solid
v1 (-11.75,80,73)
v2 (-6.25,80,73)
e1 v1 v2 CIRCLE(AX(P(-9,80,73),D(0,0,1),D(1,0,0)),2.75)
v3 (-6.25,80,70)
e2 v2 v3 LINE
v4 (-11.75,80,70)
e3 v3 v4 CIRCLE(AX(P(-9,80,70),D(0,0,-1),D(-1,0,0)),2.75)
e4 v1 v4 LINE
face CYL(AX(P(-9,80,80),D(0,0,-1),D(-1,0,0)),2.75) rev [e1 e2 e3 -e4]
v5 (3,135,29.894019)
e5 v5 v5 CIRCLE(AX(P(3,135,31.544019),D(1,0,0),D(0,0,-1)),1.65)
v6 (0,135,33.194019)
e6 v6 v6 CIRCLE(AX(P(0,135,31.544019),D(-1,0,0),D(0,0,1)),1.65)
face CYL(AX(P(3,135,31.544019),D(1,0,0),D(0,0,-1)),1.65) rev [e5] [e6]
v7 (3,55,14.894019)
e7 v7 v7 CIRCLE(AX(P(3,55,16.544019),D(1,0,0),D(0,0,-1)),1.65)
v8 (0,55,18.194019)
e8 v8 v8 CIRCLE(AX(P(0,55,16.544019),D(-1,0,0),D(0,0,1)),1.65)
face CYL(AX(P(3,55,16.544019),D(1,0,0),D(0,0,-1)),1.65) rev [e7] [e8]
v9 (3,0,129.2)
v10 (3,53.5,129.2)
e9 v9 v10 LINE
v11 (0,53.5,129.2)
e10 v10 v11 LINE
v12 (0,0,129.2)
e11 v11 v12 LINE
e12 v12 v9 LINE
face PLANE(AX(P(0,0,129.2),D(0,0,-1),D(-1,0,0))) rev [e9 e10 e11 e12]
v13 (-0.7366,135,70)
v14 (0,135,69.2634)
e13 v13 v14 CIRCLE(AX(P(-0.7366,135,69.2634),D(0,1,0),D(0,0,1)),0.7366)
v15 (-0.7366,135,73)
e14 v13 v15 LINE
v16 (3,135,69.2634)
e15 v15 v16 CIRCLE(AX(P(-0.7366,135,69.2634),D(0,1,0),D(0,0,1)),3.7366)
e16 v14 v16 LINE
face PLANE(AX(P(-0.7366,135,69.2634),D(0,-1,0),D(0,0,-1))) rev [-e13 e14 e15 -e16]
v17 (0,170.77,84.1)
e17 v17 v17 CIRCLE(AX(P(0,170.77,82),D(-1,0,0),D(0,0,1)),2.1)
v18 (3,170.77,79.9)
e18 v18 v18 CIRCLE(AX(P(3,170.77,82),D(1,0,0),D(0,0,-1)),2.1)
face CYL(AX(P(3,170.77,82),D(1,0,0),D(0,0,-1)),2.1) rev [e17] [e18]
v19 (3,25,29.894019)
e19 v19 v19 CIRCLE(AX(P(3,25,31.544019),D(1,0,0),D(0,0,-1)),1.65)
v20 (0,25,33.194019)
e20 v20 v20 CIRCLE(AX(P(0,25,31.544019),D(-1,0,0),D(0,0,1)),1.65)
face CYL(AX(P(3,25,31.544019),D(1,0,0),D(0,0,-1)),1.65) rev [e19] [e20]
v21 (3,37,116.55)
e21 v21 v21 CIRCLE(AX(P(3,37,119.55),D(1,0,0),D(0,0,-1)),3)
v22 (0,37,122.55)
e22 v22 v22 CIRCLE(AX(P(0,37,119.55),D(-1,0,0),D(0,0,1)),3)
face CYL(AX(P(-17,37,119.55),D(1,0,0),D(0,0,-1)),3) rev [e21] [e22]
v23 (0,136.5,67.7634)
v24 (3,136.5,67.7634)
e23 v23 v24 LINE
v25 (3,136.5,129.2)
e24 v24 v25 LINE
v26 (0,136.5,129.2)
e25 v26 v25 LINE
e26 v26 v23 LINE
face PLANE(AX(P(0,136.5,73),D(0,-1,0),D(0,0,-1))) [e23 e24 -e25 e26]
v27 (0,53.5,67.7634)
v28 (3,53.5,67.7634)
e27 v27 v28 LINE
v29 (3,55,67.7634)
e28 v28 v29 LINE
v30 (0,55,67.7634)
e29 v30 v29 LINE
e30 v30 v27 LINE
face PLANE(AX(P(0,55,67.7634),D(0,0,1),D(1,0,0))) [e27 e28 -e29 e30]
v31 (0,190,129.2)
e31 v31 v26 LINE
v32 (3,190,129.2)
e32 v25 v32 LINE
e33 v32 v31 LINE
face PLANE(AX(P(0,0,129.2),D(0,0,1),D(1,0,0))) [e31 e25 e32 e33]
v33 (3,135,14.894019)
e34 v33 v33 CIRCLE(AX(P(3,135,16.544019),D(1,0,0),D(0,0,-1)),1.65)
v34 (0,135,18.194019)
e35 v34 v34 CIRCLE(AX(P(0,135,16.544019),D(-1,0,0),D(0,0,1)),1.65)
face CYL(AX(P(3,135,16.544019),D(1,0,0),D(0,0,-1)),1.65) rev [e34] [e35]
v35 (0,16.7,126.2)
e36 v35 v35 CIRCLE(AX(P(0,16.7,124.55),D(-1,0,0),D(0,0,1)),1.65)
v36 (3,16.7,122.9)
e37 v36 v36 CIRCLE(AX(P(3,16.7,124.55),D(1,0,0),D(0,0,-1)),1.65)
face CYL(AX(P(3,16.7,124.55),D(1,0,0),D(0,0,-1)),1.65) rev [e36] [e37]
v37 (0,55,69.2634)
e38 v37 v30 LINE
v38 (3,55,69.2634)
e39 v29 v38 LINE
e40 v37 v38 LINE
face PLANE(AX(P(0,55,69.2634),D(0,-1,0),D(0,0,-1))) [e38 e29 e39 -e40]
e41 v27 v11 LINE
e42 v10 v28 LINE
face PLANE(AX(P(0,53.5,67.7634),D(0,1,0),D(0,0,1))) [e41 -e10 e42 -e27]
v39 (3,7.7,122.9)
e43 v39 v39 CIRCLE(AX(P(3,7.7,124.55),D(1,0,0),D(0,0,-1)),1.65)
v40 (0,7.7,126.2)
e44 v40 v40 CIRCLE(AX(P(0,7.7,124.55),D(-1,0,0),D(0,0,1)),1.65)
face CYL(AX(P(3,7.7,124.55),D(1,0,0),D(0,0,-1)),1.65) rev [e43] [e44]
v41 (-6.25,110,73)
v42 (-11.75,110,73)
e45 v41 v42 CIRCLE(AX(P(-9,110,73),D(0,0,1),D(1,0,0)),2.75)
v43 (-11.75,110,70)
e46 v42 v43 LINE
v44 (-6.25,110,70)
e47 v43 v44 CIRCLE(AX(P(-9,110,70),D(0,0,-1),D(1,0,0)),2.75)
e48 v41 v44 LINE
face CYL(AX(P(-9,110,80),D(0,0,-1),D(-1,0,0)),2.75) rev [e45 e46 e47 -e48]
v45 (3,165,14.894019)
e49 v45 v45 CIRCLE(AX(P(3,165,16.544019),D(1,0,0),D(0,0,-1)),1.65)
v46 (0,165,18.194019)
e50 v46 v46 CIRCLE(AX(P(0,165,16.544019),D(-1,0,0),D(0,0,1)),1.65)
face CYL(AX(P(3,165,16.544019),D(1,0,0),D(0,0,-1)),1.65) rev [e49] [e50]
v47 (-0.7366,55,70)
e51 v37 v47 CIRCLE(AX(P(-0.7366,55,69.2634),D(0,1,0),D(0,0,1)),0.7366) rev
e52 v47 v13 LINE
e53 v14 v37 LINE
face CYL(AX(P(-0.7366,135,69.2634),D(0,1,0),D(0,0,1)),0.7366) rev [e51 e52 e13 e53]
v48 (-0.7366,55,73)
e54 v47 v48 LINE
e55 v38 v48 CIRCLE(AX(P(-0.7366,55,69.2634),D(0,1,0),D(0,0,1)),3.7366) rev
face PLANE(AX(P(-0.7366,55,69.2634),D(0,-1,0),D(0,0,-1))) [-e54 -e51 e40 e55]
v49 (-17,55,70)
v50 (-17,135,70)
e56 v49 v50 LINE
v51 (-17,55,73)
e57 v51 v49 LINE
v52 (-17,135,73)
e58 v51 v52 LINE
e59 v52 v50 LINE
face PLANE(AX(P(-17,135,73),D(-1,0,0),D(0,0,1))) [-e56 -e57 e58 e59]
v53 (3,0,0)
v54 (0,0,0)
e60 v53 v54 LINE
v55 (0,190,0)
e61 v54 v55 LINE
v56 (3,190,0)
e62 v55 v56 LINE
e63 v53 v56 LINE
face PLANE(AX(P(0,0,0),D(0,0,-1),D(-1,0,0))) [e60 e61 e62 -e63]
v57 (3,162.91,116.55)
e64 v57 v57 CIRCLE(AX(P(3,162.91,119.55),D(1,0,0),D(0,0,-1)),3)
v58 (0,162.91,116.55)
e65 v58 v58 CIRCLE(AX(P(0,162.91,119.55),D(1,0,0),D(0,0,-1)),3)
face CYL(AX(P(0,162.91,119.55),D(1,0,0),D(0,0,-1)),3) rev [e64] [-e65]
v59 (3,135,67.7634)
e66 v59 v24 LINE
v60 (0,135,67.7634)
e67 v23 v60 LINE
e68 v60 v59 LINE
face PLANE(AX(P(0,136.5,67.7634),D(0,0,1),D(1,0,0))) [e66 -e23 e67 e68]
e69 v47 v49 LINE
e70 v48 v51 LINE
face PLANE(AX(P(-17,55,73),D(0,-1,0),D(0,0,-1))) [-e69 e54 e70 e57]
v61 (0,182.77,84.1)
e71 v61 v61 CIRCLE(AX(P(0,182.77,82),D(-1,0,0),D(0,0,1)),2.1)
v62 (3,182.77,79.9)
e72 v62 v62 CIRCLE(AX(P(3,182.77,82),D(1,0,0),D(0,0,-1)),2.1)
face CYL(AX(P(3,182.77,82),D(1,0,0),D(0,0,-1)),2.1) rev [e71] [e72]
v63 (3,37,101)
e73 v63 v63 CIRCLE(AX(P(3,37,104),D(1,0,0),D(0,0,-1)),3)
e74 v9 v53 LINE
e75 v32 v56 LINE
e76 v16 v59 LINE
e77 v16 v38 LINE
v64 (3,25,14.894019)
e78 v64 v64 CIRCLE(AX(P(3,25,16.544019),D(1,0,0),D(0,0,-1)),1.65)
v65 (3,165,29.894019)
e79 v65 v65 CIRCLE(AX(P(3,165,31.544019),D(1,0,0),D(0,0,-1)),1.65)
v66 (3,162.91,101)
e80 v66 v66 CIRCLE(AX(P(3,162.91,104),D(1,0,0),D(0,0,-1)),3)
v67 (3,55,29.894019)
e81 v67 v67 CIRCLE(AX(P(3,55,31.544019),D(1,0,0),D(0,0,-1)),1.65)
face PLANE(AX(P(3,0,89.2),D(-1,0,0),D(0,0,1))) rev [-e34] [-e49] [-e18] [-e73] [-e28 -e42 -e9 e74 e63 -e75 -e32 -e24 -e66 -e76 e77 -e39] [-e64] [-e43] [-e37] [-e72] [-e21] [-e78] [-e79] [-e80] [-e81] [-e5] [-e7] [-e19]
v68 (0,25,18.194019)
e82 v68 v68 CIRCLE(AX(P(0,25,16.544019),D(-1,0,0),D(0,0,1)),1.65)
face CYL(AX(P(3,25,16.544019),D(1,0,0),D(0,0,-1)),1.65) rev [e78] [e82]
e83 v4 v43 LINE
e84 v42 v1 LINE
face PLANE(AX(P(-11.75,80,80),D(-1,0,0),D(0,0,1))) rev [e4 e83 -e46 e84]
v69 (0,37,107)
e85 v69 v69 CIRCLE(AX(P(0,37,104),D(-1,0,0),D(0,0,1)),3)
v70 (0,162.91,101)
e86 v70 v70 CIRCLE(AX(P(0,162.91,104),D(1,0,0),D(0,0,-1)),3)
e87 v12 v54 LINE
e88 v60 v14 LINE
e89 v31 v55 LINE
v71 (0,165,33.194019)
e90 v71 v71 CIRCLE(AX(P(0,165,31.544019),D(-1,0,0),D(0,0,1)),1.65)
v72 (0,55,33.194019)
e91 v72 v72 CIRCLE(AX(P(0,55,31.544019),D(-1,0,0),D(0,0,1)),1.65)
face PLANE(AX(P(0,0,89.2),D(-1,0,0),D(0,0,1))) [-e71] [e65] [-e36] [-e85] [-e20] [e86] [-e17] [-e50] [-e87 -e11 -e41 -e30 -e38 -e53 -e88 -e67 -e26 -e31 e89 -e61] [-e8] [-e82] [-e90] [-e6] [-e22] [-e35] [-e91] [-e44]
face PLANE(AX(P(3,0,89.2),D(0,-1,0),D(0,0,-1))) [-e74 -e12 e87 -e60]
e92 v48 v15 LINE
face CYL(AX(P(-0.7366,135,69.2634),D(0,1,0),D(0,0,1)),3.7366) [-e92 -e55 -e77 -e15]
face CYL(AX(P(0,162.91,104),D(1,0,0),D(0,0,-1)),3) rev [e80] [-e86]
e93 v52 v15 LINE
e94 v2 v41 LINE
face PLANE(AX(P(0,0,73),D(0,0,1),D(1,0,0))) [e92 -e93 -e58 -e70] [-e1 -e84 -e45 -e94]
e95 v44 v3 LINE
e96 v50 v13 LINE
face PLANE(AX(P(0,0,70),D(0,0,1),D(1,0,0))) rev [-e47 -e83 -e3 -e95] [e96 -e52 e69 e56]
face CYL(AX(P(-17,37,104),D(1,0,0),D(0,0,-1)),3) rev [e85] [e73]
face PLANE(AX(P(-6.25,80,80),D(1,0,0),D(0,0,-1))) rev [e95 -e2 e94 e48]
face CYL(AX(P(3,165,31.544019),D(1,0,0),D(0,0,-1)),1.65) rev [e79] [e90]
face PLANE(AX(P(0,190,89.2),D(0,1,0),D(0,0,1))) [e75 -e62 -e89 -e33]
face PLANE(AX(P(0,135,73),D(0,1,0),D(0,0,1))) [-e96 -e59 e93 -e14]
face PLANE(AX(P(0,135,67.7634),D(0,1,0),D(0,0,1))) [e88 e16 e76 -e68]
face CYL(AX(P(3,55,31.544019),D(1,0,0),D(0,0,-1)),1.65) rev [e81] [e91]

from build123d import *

# Parameters (mm, degrees)
SKETCH_2_W               = 3
SKETCH_2_H               = 190
SM_BASE_FLANGE_1_DEPTH   = 89.2
SKETCH_14_W              = 16.2
SKETCH_14_H              = 80
CUT_EXTRUDE_2_DEPTH      = 10
SM_START                 = 53.5
SM_EDGE_FLANGE_1_DEPTH   = 83
SM_EDGE_FLANGE_1_2_DEPTH = 1.5
SM_START_2               = 135
SM_EDGE_FLANGE_1_3_DEPTH = 1.5
SM_START_3               = 55
SM_EDGE_FLANGE_1_4_DEPTH = 80
CUT_EXTRUDE_START        = -1.5
SKETCH_18_W              = 3
SKETCH_18_H              = 16.2
CUT_EXTRUDE_3_DEPTH      = 1.5
SKETCH_19_W              = 3
SKETCH_19_H              = 16.2
CUT_EXTRUDE_4_DEPTH      = 1.5
CUT_EXTRUDE_5_DEPTH      = 10
HOLE_WIZARD_M4_2_D       = 3.3
HOLE_WIZARD_M4_2_DEPTH   = 10.1
HOLE_WIZARD_M4_2_TIP     = 0.991420021
HOLE_WIZARD_M5_1_D       = 4.2
HOLE_WIZARD_M5_1_DEPTH   = 12.4
HOLE_WIZARD_M5_1_TIP     = 1.2618073
SKETCH_25_W              = 3
SKETCH_25_H              = 53.5
EXTRUDE_1_DEPTH          = 40
SKETCH_26_R              = 3
CUT_EXTRUDE_6_DEPTH      = 3
PATTERN_LINEAR_1_COUNT   = 2
PATTERN_LINEAR_1_PITCH   = 15.55
SKETCH_27_R              = 3
CUT_EXTRUDE_7_DEPTH      = 231.635296518
HOLE_WIZARD_M4_3_D       = 3.3
HOLE_WIZARD_M4_3_DEPTH   = 10.1
HOLE_WIZARD_M4_3_TIP     = 0.991420021


# Read off the part's stored shape, not the designer's step: 边线-法兰1
# Sheet-metal steps are written as plain solids
with BuildPart() as part:
    # Sketch 2 → 基体-法兰1 (new body)
    with BuildSketch(Plane.XY):
        with Locations((1.5, 95)):
            Rectangle(SKETCH_2_W, SKETCH_2_H)
    extrude(amount=SM_BASE_FLANGE_1_DEPTH)

    # 草图14 → 切除-拉伸2 (cut)
    with BuildSketch(Plane(origin=(3, 0, 0), x_dir=(0, 0, -1), z_dir=(1, 0, 0))):
        with Locations((-81.1, 95)):
            Rectangle(SKETCH_14_W, SKETCH_14_H)
    extrude(amount=-CUT_EXTRUDE_2_DEPTH, mode=Mode.SUBTRACT)

    # 边线-法兰1 outline → 边线-法兰1 (cut)
    with BuildSketch(Plane(origin=(0, 0, 0), x_dir=(1, 0, 0), z_dir=(0, 1, 0)).offset(SM_START)):
        with BuildLine():
            Line((3, -73), (3, -69.2634))
            ThreePointArc((3, -69.2634), (2.154295979, -71.630867001), (0, -72.926677222))
            Line((0, -72.926677222), (0, -73))
            Line((0, -73), (3, -73))
        make_face()
    extrude(amount=SM_EDGE_FLANGE_1_DEPTH, mode=Mode.SUBTRACT)

    # Sm Edge Flange 1 2 outline → Sm Edge Flange 1 2 (cut)
    with BuildSketch(Plane(origin=(0, 0, 0), x_dir=(1, 0, 0), z_dir=(0, 1, 0)).offset(SM_START)):
        with BuildLine():
            Line((3, -67.7634), (0, -67.7634))
            Line((0, -67.7634), (0, -72.926677222))
            ThreePointArc((0, -72.926677222), (2.154295979, -71.630867001), (3, -69.2634))
            Line((3, -69.2634), (3, -67.7634))
        make_face()
    extrude(amount=SM_EDGE_FLANGE_1_2_DEPTH, mode=Mode.SUBTRACT)

    # Sm Edge Flange 1 3 outline → Sm Edge Flange 1 3 (cut)
    with BuildSketch(Plane(origin=(0, 0, 0), x_dir=(1, 0, 0), z_dir=(0, 1, 0)).offset(SM_START_2)):
        with BuildLine():
            Line((3, -67.7634), (0, -67.7634))
            Line((0, -67.7634), (0, -72.926677222))
            ThreePointArc((0, -72.926677222), (2.154295979, -71.630867001), (3, -69.2634))
            Line((3, -69.2634), (3, -67.7634))
        make_face()
    extrude(amount=SM_EDGE_FLANGE_1_3_DEPTH, mode=Mode.SUBTRACT)

    # Sm Edge Flange 1 4 outline → Sm Edge Flange 1 4 (add)
    with BuildSketch(Plane(origin=(0, 0, 0), x_dir=(1, 0, 0), z_dir=(0, 1, 0)).offset(SM_START_3)):
        with BuildLine():
            Line((0, -72.926677222), (0, -69.2634))
            ThreePointArc((0, -69.2634), (-0.215745145, -69.784254855), (-0.7366, -70))
            Line((-0.7366, -70), (-17, -70))
            Line((-17, -70), (-17, -73))
            Line((-17, -73), (-0.7366, -73))
            ThreePointArc((-0.7366, -73), (-0.36647982, -72.981624121), (0, -72.926677222))
        make_face()
    extrude(amount=SM_EDGE_FLANGE_1_4_DEPTH)

    # 草图18 → 切除-拉伸3 (cut)
    with BuildSketch(Plane.XZ.offset(-135).offset(CUT_EXTRUDE_START)):
        with Locations((1.5, 81.1)):
            Rectangle(SKETCH_18_W, SKETCH_18_H)
    extrude(amount=CUT_EXTRUDE_3_DEPTH, mode=Mode.SUBTRACT)

    # 草图19 → 切除-拉伸4 (cut)
    with BuildSketch(Plane(origin=(0, 55, 0), x_dir=(1, 0, 0), z_dir=(0, 1, 0)).offset(CUT_EXTRUDE_START)):
        with Locations((1.5, -81.1)):
            Rectangle(SKETCH_19_W, SKETCH_19_H)
    extrude(amount=CUT_EXTRUDE_4_DEPTH, mode=Mode.SUBTRACT)

    # 草图20 → 切除-拉伸5 (cut)
    with BuildSketch(Plane(origin=(0, 0, 70), x_dir=(-1, 0, 0), z_dir=(0, 0, -1))):
        with BuildLine():
            Line((6.25, 80), (6.25, 110))
            ThreePointArc((6.25, 110), (9, 112.75), (11.75, 110))
            Line((11.75, 110), (11.75, 80))
            ThreePointArc((11.75, 80), (9, 77.25), (6.25, 80))
        make_face()
    extrude(amount=-CUT_EXTRUDE_5_DEPTH, mode=Mode.SUBTRACT)

    # M4 螺纹孔2
    with Locations(Plane(origin=(3, 0, 0), x_dir=(0, 0, -1), z_dir=(1, 0, 0))):
        with Locations((-31.544019194, 25), (-16.544019194, 25), (-31.544019194, 55), (-16.544019194, 55), (-16.544019194, 135), (-31.544019194, 135), (-16.544019194, 165), (-31.544019194, 165)):
            Hole(HOLE_WIZARD_M4_2_D / 2, depth=HOLE_WIZARD_M4_2_DEPTH)
            with Locations((0, 0, -(HOLE_WIZARD_M4_2_DEPTH + HOLE_WIZARD_M4_2_TIP / 2))):  # 118° drill point
                Cone(0, HOLE_WIZARD_M4_2_D / 2, HOLE_WIZARD_M4_2_TIP, mode=Mode.SUBTRACT)

    # M5 螺纹孔1
    with Locations(Plane(origin=(3, 0, 0), x_dir=(0, 0, -1), z_dir=(1, 0, 0))):
        with Locations((-82, 170.77), (-82, 182.77)):
            Hole(HOLE_WIZARD_M5_1_D / 2, depth=HOLE_WIZARD_M5_1_DEPTH)
            with Locations((0, 0, -(HOLE_WIZARD_M5_1_DEPTH + HOLE_WIZARD_M5_1_TIP / 2))):  # 118° drill point
                Cone(0, HOLE_WIZARD_M5_1_D / 2, HOLE_WIZARD_M5_1_TIP, mode=Mode.SUBTRACT)

    # 草图25 → 凸台-拉伸1 (add)
    with BuildSketch(Plane.XY.offset(89.2)):
        with Locations((1.5, 163.25)):
            Rectangle(SKETCH_25_W, SKETCH_25_H)
        with Locations((1.5, 26.75)):
            Rectangle(SKETCH_25_W, SKETCH_25_H)
    extrude(amount=EXTRUDE_1_DEPTH)

    # 草图26 → 切除-拉伸6 (cut)
    with BuildSketch(Plane(origin=(3, 0, 0), x_dir=(0, 0, -1), z_dir=(1, 0, 0))):
        with Locations((-119.55, 162.91)):
            Circle(SKETCH_26_R)
    cut_extrude_6 = extrude(amount=-CUT_EXTRUDE_6_DEPTH, mode=Mode.SUBTRACT)

    # 阵列(线性)1: 切除-拉伸6 ×2
    with Locations(*[(0, 0, -i * PATTERN_LINEAR_1_PITCH) for i in range(1, PATTERN_LINEAR_1_COUNT)]):
        add(cut_extrude_6, mode=Mode.SUBTRACT)

    # 草图27 → 切除-拉伸7 (cut, through all)
    with BuildSketch(Plane(origin=(3, 0, 0), x_dir=(0, 0, -1), z_dir=(1, 0, 0))):
        with Locations((-104, 37)):
            Circle(SKETCH_27_R)
        with Locations((-119.55, 37)):
            Circle(SKETCH_27_R)
    extrude(amount=-CUT_EXTRUDE_7_DEPTH, mode=Mode.SUBTRACT)

    # M4 螺纹孔3
    with Locations(Plane(origin=(3, 0, 0), x_dir=(0, 0, -1), z_dir=(1, 0, 0))):
        with Locations((-124.55, 16.7), (-124.55, 7.7)):
            Hole(HOLE_WIZARD_M4_3_D / 2, depth=HOLE_WIZARD_M4_3_DEPTH)
            with Locations((0, 0, -(HOLE_WIZARD_M4_3_DEPTH + HOLE_WIZARD_M4_3_TIP / 2))):  # 118° drill point
                Cone(0, HOLE_WIZARD_M4_3_D / 2, HOLE_WIZARD_M4_3_TIP, mode=Mode.SUBTRACT)


solid = part.part
